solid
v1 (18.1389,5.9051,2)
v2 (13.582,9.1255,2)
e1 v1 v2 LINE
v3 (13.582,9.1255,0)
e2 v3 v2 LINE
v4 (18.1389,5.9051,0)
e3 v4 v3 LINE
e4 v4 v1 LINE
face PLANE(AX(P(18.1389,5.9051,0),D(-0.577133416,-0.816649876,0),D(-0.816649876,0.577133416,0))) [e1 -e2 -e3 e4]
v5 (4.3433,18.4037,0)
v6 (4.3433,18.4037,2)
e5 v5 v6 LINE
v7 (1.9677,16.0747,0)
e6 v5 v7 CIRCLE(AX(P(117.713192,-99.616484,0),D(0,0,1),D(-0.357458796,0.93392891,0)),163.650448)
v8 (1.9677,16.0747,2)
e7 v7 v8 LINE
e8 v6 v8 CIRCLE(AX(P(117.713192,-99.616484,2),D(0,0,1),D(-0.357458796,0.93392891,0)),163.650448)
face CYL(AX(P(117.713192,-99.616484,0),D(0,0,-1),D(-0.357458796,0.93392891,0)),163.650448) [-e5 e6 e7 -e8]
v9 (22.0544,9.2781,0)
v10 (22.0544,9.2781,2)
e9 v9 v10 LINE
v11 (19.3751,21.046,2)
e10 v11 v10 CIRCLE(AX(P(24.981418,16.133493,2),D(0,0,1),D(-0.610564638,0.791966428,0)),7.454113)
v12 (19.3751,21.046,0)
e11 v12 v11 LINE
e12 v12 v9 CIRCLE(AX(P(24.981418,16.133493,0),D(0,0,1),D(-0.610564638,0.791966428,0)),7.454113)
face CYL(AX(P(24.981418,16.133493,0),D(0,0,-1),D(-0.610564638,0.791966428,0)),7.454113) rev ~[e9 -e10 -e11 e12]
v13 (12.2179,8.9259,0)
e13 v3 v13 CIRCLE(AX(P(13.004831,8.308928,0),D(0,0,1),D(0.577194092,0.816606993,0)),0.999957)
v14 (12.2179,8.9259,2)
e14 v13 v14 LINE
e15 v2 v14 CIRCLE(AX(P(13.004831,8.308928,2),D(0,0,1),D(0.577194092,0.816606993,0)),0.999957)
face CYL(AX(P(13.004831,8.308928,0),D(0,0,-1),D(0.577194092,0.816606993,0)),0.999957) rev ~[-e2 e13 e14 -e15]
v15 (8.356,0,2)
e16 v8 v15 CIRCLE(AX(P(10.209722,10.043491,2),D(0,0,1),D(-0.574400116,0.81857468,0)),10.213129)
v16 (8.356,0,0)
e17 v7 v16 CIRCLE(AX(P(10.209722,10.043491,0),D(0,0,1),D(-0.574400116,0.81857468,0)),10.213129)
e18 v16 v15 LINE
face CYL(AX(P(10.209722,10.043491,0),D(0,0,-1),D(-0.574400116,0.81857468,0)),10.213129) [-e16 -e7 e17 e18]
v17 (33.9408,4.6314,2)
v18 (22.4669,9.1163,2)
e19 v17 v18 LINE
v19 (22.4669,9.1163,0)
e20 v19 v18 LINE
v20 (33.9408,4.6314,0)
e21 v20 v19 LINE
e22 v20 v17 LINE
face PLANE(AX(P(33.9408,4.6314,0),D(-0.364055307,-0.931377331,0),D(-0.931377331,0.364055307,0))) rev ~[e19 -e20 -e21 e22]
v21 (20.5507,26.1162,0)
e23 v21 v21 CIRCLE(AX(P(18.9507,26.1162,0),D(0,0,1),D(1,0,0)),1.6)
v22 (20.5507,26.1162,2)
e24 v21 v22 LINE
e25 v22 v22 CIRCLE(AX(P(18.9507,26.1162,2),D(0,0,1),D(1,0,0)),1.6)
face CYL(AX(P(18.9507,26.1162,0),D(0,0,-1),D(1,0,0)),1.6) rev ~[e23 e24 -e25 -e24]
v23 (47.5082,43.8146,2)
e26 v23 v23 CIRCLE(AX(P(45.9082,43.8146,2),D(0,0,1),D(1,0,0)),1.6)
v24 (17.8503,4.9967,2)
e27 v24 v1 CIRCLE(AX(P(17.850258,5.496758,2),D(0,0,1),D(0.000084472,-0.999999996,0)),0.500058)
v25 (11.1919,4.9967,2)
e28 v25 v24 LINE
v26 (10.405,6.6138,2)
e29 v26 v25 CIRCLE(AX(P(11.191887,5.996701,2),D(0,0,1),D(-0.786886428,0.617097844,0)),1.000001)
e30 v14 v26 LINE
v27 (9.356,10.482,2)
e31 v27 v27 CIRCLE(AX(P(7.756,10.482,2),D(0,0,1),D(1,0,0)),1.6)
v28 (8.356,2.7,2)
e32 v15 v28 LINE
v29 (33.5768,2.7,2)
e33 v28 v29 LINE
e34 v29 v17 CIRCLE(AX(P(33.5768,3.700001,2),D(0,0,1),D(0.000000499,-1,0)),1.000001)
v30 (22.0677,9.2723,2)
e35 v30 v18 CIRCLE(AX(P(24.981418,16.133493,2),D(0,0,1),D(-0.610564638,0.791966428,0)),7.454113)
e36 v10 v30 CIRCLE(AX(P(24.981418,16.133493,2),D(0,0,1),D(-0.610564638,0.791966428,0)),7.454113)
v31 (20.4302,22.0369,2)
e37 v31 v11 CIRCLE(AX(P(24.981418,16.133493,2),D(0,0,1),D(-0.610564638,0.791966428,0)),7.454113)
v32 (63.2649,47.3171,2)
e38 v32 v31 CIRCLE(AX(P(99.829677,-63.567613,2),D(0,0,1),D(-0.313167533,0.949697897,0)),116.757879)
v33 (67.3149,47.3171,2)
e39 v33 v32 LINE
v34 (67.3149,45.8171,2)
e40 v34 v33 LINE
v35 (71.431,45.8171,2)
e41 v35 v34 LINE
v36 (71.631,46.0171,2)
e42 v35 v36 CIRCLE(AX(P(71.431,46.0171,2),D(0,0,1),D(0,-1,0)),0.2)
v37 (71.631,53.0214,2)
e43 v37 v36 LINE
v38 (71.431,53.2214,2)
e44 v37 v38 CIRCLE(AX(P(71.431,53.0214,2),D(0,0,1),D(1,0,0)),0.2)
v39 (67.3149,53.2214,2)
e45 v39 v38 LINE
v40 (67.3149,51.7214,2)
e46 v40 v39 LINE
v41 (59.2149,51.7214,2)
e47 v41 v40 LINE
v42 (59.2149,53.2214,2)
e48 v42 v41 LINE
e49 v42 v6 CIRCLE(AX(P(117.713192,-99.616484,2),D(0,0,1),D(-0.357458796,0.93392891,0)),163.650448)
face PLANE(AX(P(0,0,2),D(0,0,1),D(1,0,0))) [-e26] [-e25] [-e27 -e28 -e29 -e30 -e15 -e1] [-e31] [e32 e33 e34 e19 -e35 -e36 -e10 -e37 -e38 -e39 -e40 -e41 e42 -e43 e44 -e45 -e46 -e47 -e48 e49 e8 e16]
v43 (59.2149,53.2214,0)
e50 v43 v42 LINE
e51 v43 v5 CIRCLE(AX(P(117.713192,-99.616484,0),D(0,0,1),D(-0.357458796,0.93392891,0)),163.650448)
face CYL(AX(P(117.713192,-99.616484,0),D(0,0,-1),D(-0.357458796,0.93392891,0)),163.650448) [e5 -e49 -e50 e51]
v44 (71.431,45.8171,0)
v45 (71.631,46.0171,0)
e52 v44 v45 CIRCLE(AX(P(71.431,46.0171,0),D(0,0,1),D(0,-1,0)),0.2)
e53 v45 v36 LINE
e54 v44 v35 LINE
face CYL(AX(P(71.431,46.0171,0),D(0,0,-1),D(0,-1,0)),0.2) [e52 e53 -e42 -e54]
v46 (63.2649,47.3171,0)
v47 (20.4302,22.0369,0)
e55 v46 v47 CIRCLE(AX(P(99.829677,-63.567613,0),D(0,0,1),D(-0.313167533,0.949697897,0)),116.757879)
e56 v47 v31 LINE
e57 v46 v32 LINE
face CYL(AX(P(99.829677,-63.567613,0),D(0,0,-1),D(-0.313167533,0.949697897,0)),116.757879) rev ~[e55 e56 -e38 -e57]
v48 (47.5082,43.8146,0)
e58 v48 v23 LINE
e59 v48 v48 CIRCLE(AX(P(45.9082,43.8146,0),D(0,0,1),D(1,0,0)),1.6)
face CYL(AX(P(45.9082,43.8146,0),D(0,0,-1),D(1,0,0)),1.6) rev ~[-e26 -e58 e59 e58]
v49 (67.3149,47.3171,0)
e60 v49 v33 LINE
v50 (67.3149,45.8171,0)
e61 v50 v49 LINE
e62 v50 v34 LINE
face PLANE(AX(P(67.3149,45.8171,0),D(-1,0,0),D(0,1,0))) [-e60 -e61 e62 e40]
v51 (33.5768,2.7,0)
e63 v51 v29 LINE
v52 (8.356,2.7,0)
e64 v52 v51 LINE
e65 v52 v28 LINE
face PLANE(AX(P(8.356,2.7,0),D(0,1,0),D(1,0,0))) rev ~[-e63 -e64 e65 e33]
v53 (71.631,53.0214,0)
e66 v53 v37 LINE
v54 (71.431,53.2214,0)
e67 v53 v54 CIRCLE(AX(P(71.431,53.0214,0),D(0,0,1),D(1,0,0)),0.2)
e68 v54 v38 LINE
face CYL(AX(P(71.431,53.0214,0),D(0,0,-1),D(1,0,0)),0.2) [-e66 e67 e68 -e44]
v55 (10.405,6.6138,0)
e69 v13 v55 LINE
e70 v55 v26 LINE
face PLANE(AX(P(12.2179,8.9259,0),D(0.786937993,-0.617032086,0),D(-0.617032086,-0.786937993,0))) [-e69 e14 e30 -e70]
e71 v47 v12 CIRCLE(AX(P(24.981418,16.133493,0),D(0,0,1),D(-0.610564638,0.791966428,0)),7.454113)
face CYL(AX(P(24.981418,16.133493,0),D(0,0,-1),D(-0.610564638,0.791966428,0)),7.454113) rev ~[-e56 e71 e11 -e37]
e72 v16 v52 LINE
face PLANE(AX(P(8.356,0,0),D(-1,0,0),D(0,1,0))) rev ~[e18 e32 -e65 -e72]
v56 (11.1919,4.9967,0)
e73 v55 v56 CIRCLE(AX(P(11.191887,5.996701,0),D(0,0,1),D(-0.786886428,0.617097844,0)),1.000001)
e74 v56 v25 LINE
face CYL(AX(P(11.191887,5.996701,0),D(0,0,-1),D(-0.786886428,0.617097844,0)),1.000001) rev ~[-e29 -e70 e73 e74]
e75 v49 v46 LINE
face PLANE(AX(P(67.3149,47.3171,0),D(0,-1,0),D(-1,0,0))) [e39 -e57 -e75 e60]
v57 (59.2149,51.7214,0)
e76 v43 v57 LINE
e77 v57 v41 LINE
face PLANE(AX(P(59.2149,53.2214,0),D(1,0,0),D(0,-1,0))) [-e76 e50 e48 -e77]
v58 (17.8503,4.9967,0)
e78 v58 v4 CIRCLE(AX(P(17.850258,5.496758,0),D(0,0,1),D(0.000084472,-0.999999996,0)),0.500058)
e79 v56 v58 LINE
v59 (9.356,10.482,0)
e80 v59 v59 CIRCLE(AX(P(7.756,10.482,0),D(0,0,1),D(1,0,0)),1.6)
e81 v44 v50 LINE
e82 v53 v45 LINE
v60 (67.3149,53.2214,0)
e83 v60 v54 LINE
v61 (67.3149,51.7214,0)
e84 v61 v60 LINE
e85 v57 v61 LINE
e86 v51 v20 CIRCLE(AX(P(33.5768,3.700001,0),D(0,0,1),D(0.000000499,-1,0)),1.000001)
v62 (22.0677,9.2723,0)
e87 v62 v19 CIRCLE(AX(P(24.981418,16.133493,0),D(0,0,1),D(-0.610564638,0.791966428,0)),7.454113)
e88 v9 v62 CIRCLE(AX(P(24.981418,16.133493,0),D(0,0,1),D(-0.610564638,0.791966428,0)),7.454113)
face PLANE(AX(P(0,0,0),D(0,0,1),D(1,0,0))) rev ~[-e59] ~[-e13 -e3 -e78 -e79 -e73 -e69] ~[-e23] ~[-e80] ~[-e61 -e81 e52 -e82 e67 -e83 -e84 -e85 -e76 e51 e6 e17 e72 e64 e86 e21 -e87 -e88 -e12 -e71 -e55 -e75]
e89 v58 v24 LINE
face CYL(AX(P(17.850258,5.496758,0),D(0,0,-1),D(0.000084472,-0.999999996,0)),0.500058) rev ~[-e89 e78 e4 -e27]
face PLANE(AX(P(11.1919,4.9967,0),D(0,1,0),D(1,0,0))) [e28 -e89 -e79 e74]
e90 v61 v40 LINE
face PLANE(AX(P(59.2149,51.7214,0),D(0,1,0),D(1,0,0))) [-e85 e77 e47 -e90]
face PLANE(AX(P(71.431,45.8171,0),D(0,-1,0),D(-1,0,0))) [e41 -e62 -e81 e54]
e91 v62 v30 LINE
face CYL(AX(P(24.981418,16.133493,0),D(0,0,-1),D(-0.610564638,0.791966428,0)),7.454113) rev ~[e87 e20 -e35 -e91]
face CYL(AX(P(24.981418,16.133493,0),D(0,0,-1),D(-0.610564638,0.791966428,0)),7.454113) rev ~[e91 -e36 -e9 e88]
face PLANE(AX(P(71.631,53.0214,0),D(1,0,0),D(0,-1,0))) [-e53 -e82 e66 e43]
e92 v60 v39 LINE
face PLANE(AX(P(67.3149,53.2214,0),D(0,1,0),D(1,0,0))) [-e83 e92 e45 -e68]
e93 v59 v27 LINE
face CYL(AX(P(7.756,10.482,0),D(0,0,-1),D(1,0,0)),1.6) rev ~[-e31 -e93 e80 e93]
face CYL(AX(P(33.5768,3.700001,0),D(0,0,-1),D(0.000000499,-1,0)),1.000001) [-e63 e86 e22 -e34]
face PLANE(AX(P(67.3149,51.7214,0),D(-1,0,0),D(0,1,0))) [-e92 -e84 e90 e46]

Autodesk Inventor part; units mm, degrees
ref_plane "YZ Plane" through (0, 0, 0) normal (1, 0, 0) x (0, 1, 0)
ref_plane "XZ Plane" through (0, 0, 0) normal (0, 1, 0) x (-1, 0, 0)
ref_plane "XY Plane" through (0, 0, 0) normal (0, 0, 1) x (1, 0, 0)
sketch "Side Part" plane through (0, 0, 0) normal (0, 0, 1) x (1, 0, 0)
  arc A0 (59.2149, 53.2214) -> (1.9677, 16.0747) centre (117.7132, -99.6165) ccw
  arc A1 (63.2649, 47.3171) -> (19.3751, 21.046) centre (99.8299, -63.5681) ccw
  arc A2 (19.3751, 21.046) -> (22.0544, 9.2781) centre (24.9814, 16.1335) ccw
  arc A3 (1.9677, 16.0747) -> (8.356, 0) centre (10.2097, 10.0435) ccw
  circle A4 centre (18.9507, 26.1162) radius 1.6
  circle A5 centre (45.9082, 43.8146) radius 1.6
  line L0 (8.356, 0) -> (8.356, 2.7)
  line L1 (59.2149, 53.2214) -> (59.2149, 51.7214)
  line L2 (59.2149, 51.7214) -> (67.3149, 51.7214)
  line L3 (67.3149, 51.7214) -> (67.3149, 53.2214)
  line L4 (71.631, 46.0171) -> (71.631, 53.0214)
  line L5 (67.3149, 53.2214) -> (71.431, 53.2214)
  arc A6 (71.631, 53.0214) -> (71.431, 53.2214) centre (71.431, 53.0214) ccw
  arc A7 (22.0544, 9.2781) -> (22.0677, 9.2723) centre (22.1405, 9.4586) ccw
  circle A8 centre (7.756, 10.482) radius 1.6
  line L6 (12.2179, 8.9259) -> (10.405, 6.6138)
  arc A9 (10.405, 6.6138) -> (11.1919, 4.9967) centre (11.1919, 5.9967) ccw
  line L7 (11.1919, 4.9967) -> (17.8503, 4.9967)
  line L8 (18.1389, 5.9051) -> (13.582, 9.1255)
  arc A10 (17.8503, 4.9967) -> (18.1389, 5.9051) centre (17.8503, 5.4967) ccw
  arc A11 (13.582, 9.1255) -> (12.2179, 8.9259) centre (13.0048, 8.3088) ccw
  line L9 (8.356, 2.7) -> (33.5768, 2.7)
  arc A12 (33.5768, 2.7) -> (33.9408, 4.6314) centre (33.5768, 3.7) ccw
  line L10 (33.9408, 4.6314) -> (22.0677, 9.2723)
  line L11 (67.3149, 45.8171) -> (67.3149, 47.3171)
  line L12 (67.3149, 45.8171) -> (71.431, 45.8171)
  arc A13 (71.431, 45.8171) -> (71.631, 46.0171) centre (71.431, 46.0171) ccw
  line L13 (63.2649, 47.3171) -> (67.3149, 47.3171)
  point P0 (38.6259, 23.714)
sketch "Sketch1" plane through (0, 0, 0) normal (0, 0, 1) x (1, 0, 0)
  circle A0 centre (45.9082, 43.8146) radius 1.6
  circle A1 centre (18.9507, 26.1162) radius 1.6
  circle A2 centre (7.756, 10.482) radius 1.6
  arc A3 (10.405, 6.6138) -> (11.1919, 4.9967) centre (11.1919, 5.9967) ccw
  arc A4 (13.582, 9.1255) -> (12.2179, 8.9259) centre (13.0048, 8.3088) ccw
  arc A5 (17.8503, 4.9967) -> (18.1389, 5.9051) centre (17.8503, 5.4967) ccw
  arc A6 (20.4302, 22.0369) -> (22.4669, 9.1163) centre (24.9814, 16.1335) ccw
  arc A7 (33.5768, 2.7) -> (33.9408, 4.6314) centre (33.5768, 3.7) ccw
  arc A8 (4.3433, 18.4037) -> (8.356, 0) centre (10.2097, 10.0435) ccw
  line L0 (8.356, 0) -> (8.356, 2.7)
  line L1 (8.356, 2.7) -> (33.5768, 2.7)
  line L2 (33.9408, 4.6314) -> (22.4669, 9.1163)
  line L3 (18.1389, 5.9051) -> (13.582, 9.1255)
  line L4 (11.1919, 4.9967) -> (17.8503, 4.9967)
  line L5 (12.2179, 8.9259) -> (10.405, 6.6138)
  arc A9 (59.2149, 53.2214) -> (1.9677, 16.0747) centre (117.7132, -99.6165) ccw
  arc A10 (63.2649, 47.3171) -> (19.3751, 21.046) centre (99.8299, -63.5681) ccw
  line L6 (59.2149, 53.2214) -> (59.2149, 51.7214)
  line L7 (59.2149, 51.7214) -> (67.3149, 51.7214)
  line L8 (67.3149, 51.7214) -> (67.3149, 53.2214)
  arc A11 (71.631, 53.0214) -> (71.431, 53.2214) centre (71.431, 53.0214) ccw
  arc A12 (71.431, 45.8171) -> (71.631, 46.0171) centre (71.431, 46.0171) ccw
  line L9 (67.3149, 53.2214) -> (71.431, 53.2214)
  line L10 (71.631, 53.0214) -> (71.631, 46.0171)
  line L11 (71.431, 45.8171) -> (67.3149, 45.8171)
  line L12 (67.3149, 45.8171) -> (67.3149, 47.3171)
  line L13 (67.3149, 47.3171) -> (63.2649, 47.3171)
  arc A13 (59.2149, 53.2214) -> (1.9677, 16.0747) centre (117.7132, -99.6165) ccw
  arc A14 (63.2649, 47.3171) -> (19.3751, 21.046) centre (99.8299, -63.5681) ccw
  arc A15 (19.3751, 21.046) -> (22.0544, 9.2781) centre (24.9814, 16.1335) ccw
  arc A16 (1.9677, 16.0747) -> (8.356, 0) centre (10.2097, 10.0435) ccw
  circle A17 centre (18.9507, 26.1162) radius 1.6
  circle A18 centre (45.9082, 43.8146) radius 1.6
  line L14 (8.356, 0) -> (8.356, 2.7)
  line L15 (59.2149, 53.2214) -> (59.2149, 51.7214)
  line L16 (59.2149, 51.7214) -> (67.3149, 51.7214)
  line L17 (67.3149, 51.7214) -> (67.3149, 53.2214)
  line L18 (71.631, 46.0171) -> (71.631, 53.0214)
  line L19 (67.3149, 53.2214) -> (71.431, 53.2214)
  arc A19 (71.631, 53.0214) -> (71.431, 53.2214) centre (71.431, 53.0214) ccw
  arc A20 (22.0544, 9.2781) -> (22.0677, 9.2723) centre (22.1405, 9.4586) ccw
  circle A21 centre (7.756, 10.482) radius 1.6
  line L20 (12.2179, 8.9259) -> (10.405, 6.6138)
  arc A22 (10.405, 6.6138) -> (11.1919, 4.9967) centre (11.1919, 5.9967) ccw
  line L21 (11.1919, 4.9967) -> (17.8503, 4.9967)
  line L22 (18.1389, 5.9051) -> (13.582, 9.1255)
  arc A23 (17.8503, 4.9967) -> (18.1389, 5.9051) centre (17.8503, 5.4967) ccw
  arc A24 (13.582, 9.1255) -> (12.2179, 8.9259) centre (13.0048, 8.3088) ccw
  line L23 (8.356, 2.7) -> (33.5768, 2.7)
  arc A25 (33.5768, 2.7) -> (33.9408, 4.6314) centre (33.5768, 3.7) ccw
  line L24 (33.9408, 4.6314) -> (22.0677, 9.2723)
  line L25 (67.3149, 45.8171) -> (67.3149, 47.3171)
  line L26 (67.3149, 45.8171) -> (71.431, 45.8171)
  arc A26 (71.431, 45.8171) -> (71.631, 46.0171) centre (71.431, 46.0171) ccw
  line L27 (63.2649, 47.3171) -> (67.3149, 47.3171)
  point P0 (0, 0)
extrude "Extrusion1" add sketch "Sketch1" along normal blind 2 contours A6 L2 A7 L1 L0 A8 A9 L6 L7 L8 L9 A11 L10 A12 L11 L12 L13 A10
properties part number "Side_Part"
